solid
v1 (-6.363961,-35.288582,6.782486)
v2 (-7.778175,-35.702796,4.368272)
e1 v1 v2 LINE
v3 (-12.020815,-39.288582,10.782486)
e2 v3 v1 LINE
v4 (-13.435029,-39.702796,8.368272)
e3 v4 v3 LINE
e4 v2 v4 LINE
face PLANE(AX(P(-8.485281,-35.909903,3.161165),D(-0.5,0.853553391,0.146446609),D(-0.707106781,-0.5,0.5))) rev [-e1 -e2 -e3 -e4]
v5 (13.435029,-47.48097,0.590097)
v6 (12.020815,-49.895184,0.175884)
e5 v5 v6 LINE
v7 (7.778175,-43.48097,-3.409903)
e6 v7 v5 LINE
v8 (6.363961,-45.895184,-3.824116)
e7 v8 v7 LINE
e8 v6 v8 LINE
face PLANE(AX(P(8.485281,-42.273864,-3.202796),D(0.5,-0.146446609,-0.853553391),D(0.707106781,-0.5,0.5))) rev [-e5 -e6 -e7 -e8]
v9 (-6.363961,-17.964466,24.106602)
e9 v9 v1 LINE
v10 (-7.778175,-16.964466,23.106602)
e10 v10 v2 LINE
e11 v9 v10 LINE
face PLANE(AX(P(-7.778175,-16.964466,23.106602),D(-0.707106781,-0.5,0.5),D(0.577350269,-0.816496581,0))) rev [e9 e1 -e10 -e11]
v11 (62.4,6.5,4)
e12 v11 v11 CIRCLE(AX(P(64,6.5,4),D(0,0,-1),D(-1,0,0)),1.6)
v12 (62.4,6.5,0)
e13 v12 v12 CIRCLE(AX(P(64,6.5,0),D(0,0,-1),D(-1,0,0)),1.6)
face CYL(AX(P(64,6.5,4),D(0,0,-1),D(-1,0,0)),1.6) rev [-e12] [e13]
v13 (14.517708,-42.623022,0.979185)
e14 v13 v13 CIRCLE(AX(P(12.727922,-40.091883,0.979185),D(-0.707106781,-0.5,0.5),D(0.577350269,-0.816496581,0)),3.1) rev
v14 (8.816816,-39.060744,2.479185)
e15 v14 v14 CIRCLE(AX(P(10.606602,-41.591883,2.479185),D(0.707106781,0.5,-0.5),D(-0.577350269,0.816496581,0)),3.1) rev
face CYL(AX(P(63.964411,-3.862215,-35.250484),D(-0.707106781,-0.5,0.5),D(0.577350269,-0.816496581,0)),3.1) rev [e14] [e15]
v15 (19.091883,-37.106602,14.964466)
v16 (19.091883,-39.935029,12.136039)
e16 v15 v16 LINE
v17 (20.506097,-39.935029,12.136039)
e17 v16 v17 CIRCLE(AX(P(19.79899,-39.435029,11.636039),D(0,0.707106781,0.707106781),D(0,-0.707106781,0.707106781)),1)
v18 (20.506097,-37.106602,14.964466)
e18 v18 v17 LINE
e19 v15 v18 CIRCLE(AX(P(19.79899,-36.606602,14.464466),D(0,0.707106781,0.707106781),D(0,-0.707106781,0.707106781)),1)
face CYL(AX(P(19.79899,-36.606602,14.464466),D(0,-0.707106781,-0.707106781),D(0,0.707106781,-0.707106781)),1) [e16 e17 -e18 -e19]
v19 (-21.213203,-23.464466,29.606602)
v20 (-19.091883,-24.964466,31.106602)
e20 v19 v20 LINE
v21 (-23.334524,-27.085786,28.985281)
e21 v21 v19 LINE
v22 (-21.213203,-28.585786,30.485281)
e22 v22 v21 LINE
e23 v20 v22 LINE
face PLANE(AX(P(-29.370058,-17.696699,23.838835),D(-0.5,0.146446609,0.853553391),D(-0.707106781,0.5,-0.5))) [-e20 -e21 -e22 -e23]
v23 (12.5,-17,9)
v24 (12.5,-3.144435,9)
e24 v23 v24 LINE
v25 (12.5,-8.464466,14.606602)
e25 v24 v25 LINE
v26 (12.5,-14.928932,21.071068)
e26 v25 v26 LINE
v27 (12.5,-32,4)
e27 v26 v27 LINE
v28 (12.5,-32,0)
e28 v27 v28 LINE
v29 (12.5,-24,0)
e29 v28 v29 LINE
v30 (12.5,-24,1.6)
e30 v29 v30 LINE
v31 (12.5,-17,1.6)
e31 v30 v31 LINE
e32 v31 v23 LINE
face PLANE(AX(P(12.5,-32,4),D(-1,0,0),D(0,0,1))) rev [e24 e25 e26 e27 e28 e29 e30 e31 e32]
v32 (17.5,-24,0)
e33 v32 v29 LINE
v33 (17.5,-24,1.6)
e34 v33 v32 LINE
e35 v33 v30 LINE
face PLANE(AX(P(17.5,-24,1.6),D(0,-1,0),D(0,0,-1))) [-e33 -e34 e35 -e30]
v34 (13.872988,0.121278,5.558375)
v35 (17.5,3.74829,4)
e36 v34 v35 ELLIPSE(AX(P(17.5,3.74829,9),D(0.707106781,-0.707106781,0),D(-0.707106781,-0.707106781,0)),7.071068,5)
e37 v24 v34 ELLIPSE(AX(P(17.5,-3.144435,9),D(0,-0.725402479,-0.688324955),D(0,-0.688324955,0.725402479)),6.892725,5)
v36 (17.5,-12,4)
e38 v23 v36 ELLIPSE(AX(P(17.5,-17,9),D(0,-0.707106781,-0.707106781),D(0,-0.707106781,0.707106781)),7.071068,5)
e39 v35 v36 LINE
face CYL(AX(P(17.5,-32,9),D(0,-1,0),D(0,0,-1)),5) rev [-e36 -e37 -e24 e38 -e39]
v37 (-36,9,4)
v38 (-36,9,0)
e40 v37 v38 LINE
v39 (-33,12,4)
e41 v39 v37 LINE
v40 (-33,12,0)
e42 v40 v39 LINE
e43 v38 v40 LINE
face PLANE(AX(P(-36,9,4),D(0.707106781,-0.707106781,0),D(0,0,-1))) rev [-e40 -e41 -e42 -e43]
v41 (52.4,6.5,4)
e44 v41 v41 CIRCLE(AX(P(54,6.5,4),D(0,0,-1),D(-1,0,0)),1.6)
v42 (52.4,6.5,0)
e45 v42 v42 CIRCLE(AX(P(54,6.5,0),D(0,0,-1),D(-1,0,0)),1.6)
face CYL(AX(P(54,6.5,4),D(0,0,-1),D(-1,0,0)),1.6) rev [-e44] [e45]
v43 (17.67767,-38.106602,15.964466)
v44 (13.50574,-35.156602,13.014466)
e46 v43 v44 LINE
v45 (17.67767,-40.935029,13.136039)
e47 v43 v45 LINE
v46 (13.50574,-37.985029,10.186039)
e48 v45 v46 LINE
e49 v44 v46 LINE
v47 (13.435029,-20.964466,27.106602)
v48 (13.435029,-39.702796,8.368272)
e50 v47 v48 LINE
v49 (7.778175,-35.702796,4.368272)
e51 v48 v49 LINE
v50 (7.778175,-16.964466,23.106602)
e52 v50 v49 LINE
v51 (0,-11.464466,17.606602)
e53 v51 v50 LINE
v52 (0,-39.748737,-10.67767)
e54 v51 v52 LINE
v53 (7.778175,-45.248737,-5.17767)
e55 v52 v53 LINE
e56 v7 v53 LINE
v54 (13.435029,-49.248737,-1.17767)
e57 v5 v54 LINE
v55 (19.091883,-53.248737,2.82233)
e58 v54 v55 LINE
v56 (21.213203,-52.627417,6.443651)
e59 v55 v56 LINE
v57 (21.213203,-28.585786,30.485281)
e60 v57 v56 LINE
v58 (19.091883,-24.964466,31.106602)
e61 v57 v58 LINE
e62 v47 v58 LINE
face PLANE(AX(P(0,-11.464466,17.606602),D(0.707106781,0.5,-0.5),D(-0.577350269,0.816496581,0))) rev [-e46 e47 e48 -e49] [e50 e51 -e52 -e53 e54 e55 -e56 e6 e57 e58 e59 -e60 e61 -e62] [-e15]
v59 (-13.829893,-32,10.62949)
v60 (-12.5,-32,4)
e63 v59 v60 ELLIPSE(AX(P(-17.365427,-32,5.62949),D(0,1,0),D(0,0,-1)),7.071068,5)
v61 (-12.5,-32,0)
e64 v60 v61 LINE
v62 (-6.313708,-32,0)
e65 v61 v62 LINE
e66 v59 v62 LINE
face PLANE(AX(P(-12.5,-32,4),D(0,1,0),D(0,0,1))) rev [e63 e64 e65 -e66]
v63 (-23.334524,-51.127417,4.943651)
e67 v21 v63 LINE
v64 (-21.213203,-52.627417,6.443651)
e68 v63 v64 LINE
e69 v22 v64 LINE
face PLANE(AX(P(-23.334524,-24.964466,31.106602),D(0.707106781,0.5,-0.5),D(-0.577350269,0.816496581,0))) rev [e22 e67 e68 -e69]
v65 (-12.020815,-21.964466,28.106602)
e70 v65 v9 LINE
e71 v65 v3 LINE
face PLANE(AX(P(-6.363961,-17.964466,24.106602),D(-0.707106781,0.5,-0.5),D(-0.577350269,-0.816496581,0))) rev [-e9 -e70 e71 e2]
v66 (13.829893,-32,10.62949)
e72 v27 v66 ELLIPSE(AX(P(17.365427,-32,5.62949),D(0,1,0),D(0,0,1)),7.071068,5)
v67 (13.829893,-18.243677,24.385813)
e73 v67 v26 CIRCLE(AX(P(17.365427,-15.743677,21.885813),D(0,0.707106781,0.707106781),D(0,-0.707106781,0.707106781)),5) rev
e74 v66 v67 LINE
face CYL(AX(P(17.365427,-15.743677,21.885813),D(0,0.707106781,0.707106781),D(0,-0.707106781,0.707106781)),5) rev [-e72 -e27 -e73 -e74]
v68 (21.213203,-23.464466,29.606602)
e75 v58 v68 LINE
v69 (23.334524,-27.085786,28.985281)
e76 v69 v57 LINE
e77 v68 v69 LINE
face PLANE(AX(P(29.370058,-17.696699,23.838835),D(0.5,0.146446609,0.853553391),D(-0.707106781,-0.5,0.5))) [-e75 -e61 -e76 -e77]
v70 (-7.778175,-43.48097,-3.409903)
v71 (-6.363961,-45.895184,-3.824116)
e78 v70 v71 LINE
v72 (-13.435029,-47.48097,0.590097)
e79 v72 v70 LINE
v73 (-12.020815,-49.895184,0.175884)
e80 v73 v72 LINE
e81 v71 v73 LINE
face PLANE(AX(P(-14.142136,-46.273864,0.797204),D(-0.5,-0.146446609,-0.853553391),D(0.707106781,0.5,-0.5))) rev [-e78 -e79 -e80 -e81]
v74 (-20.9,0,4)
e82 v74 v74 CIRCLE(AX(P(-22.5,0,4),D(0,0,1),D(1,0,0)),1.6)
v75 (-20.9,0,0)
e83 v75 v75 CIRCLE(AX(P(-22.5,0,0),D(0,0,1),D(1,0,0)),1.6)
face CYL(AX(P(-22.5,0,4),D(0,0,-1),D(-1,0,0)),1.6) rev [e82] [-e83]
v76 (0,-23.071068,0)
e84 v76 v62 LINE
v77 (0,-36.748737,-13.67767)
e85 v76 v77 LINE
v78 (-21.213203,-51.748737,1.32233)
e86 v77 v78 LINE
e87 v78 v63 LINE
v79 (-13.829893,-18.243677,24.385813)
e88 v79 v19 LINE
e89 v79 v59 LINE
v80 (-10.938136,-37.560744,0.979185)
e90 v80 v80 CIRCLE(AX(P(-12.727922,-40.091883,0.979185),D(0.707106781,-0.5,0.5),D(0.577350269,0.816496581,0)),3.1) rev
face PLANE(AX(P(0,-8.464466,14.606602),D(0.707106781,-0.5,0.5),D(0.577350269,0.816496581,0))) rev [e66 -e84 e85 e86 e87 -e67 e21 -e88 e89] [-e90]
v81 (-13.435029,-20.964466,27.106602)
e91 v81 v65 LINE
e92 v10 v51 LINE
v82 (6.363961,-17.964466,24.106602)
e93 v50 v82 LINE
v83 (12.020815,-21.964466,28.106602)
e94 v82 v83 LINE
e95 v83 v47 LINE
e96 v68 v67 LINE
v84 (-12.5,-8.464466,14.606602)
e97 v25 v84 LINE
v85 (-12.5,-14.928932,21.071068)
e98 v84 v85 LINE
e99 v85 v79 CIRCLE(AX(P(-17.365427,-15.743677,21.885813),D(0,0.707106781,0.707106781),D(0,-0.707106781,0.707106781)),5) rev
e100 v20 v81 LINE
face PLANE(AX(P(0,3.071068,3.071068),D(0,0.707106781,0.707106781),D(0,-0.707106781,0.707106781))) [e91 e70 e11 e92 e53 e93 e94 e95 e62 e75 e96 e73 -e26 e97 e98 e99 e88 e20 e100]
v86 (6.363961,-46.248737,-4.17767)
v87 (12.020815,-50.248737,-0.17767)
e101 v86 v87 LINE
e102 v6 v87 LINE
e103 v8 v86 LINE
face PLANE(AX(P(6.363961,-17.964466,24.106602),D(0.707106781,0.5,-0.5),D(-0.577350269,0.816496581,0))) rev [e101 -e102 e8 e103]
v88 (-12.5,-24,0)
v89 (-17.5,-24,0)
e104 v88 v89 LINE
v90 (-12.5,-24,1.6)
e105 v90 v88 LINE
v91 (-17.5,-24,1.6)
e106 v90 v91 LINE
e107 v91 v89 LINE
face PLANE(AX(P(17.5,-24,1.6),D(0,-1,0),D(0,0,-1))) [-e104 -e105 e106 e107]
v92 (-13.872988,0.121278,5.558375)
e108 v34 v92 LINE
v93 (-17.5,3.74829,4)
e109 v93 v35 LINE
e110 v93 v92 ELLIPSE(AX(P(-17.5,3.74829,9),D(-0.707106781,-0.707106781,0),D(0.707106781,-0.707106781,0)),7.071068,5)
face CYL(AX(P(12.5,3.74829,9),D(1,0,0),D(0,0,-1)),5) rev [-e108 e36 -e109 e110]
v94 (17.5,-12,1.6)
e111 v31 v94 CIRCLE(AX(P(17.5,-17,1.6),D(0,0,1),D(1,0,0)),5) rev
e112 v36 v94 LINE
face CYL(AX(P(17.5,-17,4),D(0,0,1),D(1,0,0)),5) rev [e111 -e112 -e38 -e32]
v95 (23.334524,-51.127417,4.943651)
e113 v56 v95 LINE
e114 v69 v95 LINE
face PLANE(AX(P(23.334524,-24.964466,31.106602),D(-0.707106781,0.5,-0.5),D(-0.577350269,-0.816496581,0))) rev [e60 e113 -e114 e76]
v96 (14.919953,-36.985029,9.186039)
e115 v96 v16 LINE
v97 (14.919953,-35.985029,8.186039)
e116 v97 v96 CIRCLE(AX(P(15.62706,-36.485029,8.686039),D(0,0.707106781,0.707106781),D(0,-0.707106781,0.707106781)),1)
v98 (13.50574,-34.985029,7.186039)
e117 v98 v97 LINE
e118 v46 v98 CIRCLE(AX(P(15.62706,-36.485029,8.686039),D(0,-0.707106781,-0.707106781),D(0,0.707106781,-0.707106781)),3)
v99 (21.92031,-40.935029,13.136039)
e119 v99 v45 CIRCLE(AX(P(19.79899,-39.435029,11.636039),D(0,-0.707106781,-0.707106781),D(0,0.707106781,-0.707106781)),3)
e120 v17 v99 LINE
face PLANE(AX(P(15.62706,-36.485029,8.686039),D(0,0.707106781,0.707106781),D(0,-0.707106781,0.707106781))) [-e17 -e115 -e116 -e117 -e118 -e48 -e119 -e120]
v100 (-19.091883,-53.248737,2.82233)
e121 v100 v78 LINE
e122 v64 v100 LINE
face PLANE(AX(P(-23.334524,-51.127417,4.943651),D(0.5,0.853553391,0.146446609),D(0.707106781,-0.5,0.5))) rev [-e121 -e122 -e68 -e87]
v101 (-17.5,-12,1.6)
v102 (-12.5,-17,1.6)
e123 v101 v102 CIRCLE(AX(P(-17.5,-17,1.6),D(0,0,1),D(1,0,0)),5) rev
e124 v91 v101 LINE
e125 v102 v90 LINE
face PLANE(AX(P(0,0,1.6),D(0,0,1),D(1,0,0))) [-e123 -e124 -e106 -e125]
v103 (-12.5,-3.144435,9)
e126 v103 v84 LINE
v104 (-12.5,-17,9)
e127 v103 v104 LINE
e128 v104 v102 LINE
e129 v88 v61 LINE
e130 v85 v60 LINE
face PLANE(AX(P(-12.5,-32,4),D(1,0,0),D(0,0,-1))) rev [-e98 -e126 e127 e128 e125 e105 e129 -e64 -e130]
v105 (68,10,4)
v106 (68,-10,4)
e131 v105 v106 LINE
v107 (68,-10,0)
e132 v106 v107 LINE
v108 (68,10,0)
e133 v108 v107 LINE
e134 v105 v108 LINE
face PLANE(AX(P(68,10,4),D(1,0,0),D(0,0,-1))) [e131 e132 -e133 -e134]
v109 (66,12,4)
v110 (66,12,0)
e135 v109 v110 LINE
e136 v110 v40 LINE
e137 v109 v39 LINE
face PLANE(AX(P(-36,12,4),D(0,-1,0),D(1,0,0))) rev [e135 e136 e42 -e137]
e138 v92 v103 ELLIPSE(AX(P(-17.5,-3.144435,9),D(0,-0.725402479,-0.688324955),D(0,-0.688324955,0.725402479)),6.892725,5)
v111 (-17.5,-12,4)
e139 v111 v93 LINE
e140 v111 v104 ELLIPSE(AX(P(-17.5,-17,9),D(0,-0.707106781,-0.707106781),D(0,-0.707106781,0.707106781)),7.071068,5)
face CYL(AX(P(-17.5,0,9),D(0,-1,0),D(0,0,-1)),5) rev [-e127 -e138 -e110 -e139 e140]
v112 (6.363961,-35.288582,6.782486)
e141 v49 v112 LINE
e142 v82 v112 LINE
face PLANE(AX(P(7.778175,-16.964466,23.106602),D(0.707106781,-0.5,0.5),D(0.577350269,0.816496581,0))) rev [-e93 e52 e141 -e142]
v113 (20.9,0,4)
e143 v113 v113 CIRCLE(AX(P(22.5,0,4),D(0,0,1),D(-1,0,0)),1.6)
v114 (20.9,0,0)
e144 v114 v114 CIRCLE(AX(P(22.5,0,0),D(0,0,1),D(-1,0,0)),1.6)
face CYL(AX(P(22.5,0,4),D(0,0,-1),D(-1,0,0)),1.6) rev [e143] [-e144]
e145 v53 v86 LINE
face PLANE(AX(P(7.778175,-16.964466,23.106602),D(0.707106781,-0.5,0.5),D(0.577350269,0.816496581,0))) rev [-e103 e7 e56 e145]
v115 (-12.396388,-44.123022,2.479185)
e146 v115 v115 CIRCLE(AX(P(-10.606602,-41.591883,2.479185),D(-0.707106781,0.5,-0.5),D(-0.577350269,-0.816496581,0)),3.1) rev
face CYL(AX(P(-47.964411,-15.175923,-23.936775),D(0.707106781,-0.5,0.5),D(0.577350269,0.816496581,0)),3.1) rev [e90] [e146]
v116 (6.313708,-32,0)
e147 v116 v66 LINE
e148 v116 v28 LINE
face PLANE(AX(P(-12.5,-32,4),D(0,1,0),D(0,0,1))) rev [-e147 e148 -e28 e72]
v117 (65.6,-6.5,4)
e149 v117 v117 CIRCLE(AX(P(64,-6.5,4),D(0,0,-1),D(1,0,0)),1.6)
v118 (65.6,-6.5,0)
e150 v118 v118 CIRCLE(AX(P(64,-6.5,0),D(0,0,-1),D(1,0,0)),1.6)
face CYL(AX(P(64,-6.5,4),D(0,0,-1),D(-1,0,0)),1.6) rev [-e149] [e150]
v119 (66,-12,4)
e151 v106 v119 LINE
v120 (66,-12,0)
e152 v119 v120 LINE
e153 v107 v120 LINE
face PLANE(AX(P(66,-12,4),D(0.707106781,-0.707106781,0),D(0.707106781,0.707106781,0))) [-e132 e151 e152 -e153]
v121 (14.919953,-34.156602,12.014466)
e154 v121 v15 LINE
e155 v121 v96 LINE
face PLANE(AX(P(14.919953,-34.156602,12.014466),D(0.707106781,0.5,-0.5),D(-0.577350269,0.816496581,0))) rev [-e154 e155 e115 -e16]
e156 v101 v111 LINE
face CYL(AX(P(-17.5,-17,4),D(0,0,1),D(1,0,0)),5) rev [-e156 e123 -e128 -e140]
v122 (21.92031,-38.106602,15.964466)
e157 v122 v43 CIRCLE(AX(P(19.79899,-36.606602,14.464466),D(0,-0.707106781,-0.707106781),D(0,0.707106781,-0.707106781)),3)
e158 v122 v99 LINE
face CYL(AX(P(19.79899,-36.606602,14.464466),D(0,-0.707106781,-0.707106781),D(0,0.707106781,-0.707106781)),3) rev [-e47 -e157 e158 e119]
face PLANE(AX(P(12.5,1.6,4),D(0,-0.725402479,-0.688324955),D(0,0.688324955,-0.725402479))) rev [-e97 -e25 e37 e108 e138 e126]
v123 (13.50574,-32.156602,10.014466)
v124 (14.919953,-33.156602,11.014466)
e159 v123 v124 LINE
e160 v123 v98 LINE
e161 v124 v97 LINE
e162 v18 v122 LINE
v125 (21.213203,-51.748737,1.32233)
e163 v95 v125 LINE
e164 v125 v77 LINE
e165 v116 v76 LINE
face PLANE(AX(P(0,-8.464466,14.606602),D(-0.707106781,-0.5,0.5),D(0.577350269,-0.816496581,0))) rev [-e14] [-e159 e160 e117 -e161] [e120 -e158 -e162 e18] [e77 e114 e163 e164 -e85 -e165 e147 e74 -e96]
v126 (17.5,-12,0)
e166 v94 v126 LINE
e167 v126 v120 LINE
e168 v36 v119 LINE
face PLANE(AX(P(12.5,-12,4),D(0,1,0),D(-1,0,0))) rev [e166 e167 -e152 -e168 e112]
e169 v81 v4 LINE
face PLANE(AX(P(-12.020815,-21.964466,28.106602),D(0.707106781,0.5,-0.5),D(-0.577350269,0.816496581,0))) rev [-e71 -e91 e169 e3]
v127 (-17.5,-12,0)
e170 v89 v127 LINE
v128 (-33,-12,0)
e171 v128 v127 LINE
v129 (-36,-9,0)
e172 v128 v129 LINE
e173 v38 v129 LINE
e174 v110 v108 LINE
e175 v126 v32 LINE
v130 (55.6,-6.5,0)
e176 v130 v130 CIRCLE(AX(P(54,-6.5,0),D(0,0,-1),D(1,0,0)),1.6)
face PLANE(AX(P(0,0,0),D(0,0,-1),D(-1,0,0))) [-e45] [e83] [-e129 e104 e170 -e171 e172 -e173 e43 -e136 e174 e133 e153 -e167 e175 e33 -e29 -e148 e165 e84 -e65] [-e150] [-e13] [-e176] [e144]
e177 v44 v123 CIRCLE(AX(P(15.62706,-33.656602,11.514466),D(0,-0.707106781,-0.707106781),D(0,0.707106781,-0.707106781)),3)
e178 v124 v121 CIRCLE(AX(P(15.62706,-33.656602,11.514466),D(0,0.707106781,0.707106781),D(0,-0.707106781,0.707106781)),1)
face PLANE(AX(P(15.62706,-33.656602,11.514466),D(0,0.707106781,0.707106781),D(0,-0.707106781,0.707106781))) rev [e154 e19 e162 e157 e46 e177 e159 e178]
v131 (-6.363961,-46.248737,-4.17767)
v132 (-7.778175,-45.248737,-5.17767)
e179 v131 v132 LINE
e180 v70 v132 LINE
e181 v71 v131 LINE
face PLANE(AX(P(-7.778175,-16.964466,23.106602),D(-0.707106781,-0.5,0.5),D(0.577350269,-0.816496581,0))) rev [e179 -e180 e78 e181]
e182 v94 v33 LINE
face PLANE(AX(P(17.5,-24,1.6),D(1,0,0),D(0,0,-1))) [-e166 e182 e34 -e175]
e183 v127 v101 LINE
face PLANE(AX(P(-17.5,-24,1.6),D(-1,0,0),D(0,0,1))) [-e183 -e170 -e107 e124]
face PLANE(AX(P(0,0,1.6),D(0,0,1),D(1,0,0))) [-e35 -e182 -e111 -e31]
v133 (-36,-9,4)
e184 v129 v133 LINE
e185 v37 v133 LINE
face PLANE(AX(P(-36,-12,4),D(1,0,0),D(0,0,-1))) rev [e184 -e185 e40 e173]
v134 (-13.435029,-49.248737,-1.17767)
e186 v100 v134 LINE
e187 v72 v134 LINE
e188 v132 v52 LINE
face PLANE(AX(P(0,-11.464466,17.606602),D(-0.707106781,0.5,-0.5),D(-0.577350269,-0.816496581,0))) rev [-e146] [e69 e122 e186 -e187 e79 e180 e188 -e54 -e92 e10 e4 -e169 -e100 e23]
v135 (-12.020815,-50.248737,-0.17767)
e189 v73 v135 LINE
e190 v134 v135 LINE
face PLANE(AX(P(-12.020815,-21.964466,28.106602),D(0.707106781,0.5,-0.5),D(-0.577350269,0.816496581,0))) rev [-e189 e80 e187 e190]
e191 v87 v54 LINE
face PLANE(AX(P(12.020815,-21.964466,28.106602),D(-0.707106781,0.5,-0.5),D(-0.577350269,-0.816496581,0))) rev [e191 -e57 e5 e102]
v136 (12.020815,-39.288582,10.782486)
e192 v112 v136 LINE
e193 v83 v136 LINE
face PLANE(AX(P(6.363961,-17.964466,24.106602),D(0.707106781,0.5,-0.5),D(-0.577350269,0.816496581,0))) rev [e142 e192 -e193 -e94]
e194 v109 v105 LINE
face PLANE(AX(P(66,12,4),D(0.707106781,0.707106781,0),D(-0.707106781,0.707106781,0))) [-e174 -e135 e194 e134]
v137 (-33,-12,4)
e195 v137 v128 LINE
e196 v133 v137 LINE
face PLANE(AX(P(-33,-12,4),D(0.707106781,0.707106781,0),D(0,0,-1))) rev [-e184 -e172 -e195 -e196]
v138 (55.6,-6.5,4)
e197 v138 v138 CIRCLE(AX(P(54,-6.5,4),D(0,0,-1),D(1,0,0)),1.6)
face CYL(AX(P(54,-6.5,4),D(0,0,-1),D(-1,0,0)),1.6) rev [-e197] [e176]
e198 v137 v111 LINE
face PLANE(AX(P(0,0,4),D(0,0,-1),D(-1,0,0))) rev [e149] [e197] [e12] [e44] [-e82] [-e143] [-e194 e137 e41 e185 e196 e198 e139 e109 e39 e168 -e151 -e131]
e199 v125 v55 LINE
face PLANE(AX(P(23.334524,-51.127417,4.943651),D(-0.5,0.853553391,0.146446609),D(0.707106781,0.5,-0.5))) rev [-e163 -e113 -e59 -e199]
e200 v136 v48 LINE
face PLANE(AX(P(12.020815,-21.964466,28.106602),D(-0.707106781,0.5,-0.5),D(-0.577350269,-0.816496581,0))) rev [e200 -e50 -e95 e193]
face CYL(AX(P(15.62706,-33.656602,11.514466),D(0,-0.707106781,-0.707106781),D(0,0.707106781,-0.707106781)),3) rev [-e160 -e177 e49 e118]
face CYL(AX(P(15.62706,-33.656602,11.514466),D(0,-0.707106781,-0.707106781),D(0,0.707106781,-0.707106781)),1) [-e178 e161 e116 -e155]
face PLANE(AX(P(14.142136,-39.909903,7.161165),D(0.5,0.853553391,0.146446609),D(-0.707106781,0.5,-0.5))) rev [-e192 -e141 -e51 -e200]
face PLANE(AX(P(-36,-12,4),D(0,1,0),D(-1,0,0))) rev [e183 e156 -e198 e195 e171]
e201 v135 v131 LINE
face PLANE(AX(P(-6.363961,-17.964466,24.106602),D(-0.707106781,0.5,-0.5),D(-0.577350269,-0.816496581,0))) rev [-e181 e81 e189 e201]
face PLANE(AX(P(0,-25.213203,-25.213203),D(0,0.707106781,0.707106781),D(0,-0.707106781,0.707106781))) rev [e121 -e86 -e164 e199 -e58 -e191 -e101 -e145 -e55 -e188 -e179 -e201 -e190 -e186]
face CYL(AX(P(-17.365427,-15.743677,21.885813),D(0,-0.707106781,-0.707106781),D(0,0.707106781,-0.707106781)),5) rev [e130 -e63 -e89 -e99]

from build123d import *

# Parameters (mm, degrees)
CROQUIS1_R                   = 1.6
SALIENTE_EXTRUIR1_DEPTH      = 4
CROQUIS3_R                   = 1.6
SALIENTE_EXTRUIR3_DEPTH      = 4
SALIENTE_EXTRUIR4_DEPTH      = 10
SALIENTE_EXTRUIR4_DEPTH_BACK = 30
CORTAR_EXTRUIR8_REACH        = 97.414
CROQUIS13_R                  = 3.1
CORTAR_EXTRUIR9_DEPTH        = 2
CORTAR_EXTRUIR10_REACH       = 83.858
CROQUIS15_R                  = 3.1
CORTAR_EXTRUIR11_DEPTH       = 2
SALIENTE_EXTRUIR5_DEPTH      = 12.5
CORTAR_EXTRUIR12_DEPTH       = 95.018496218
REDONDEO1_R                  = 5
CHAFL_N1_SIZE                = 3
CROQUIS20_W                  = 35
CROQUIS20_H                  = 12
SALIENTE_EXTRUIR6_DEPTH      = 1.6
CORTAR_EXTRUIR13_START       = -16
CORTAR_EXTRUIR13_DEPTH       = 4


with BuildPart() as part:
    # Croquis1 → Saliente-Extruir1 (new body)
    with BuildSketch(Plane.XY):
        Polygon((12.5, -12), (36, -12), (36, 12), (-36, 12), (-36, -12), (-12.5, -12), (-12.5, -32), (12.5, -32), align=None)
        with Locations((-22.5, 0)):
            Circle(CROQUIS1_R, mode=Mode.SUBTRACT)
        with Locations(Location((22.5, 0, 0), (0, 0, 180))):
            Circle(CROQUIS1_R, mode=Mode.SUBTRACT)
    extrude(amount=SALIENTE_EXTRUIR1_DEPTH)

    # Croquis3 → Saliente-Extruir3 (add)
    with BuildSketch(Plane(origin=(0, 0, 0), x_dir=(-1, 0, 0), z_dir=(0, 0, -1))):
        Polygon((-66, 12), (-36, 12), (-36, -12), (-66, -12), (-68, -10), (-68, 10), align=None)
        with Locations((-54, 6.5)):
            Circle(CROQUIS3_R, mode=Mode.SUBTRACT)
        with Locations((-64, 6.5)):
            Circle(CROQUIS3_R, mode=Mode.SUBTRACT)
        with Locations(Location((-54, -6.5, 0), (0, 0, 180))):
            Circle(CROQUIS3_R, mode=Mode.SUBTRACT)
        with Locations(Location((-64, -6.5, 0), (0, 0, 180))):
            Circle(CROQUIS3_R, mode=Mode.SUBTRACT)
    extrude(amount=-SALIENTE_EXTRUIR3_DEPTH)

    # Croquis5 → Saliente-Extruir4 (add, two sides: drawn at the far end of the back side and taken through both)
    with BuildSketch(Plane(origin=(0, -4.201010127, -3.798989873), x_dir=(1, 0, 0), z_dir=(0, 0.7071067811865438, 0.7071067811865512)).offset(-SALIENTE_EXTRUIR4_DEPTH_BACK)):
        Polygon((-13.435028843, -33.707106781), (-21.213203436, -41.485281374), (-23.334523779, -39.363961031), (0, -16.029437252), (23.334523779, -39.363961031), (21.213203436, -41.485281374), (13.435028843, -33.707106781), (12.02081528, -35.121320344), (6.363961031, -29.464466094), (7.778174593, -28.050252532), (0, -20.272077939), (-7.778174593, -28.050252532), (-6.363961031, -29.464466094), (-12.02081528, -35.121320344), align=None)
    extrude(amount=SALIENTE_EXTRUIR4_DEPTH + SALIENTE_EXTRUIR4_DEPTH_BACK)

    # Croquis13 → Cortar-Extruir8 (cut, up to next)
    with BuildSketch(Plane(origin=(-11.692388155, -8.267766953, 8.267766953), x_dir=(0.40824829046385985, 0.2886751345948103, 0.866025403784441), z_dir=(-0.7071067811865496, -0.5000000000000013, 0.4999999999999959)), mode=Mode.PRIVATE) as cortar_extruir8_sk1:
        with Locations(Location((-5.529378483, -40.083354696, 0), (0, 0, 270))):
            Circle(CROQUIS13_R)
    cortar_extruir8_tool1 = extrude(cortar_extruir8_sk1.sketch, amount=-CORTAR_EXTRUIR8_REACH, mode=Mode.PRIVATE) & part.part
    add(cortar_extruir8_tool1.solids().sort_by_distance((9.192388, -42.591883, 3.479185))[0], mode=Mode.SUBTRACT)

    # Croquis14 → Cortar-Extruir9 (cut)
    with BuildSketch(Plane(origin=(-11.692388155, -8.267766953, 8.267766953), x_dir=(0.40824829046385985, 0.2886751345948103, 0.866025403784441), z_dir=(-0.7071067811865496, -0.5000000000000013, 0.4999999999999959))):
        Polygon((-11.513014174, -39.415444584), (-6.89421202, -45.947417231), (0.454257208, -40.751264808), (-4.164544945, -34.219292161), align=None)
    extrude(amount=-CORTAR_EXTRUIR9_DEPTH, mode=Mode.SUBTRACT)

    # Croquis15 → Cortar-Extruir10 (cut, up to next)
    with BuildSketch(Plane(origin=(8.62825877, -6.101100286, 14.767766953), x_dir=(0.6666666666666553, 0.23570226039552375, -0.7071067811865557), z_dir=(0.7071067811865587, -0.49999999999999484, 0.4999999999999895)), mode=Mode.PRIVATE) as cortar_extruir10_sk1:
        with Locations(Location((-12.499158228, -40.25364355, 0), (0, 0, 54.735610317))):
            Circle(CROQUIS15_R)
    cortar_extruir10_tool1 = extrude(cortar_extruir10_sk1.sketch, amount=-CORTAR_EXTRUIR10_REACH, mode=Mode.PRIVATE) & part.part
    add(cortar_extruir10_tool1.solids().sort_by_distance((-9.192388, -42.591883, 3.479185))[0], mode=Mode.SUBTRACT)

    # Croquis17 → Cortar-Extruir11 (cut)
    with BuildSketch(Plane(origin=(8.62825877, -6.101100286, 14.767766953), x_dir=(0.6666666666666595, 0.2357022603955385, -0.7071067811865467), z_dir=(0.7071067811865586, -0.4999999999999948, 0.49999999999998956))):
        Polygon((-14.770394394, -45.829617571), (-7.227922061, -43.162950904), (-10.227922061, -34.67766953), (-17.770394394, -37.344336196), align=None)
    extrude(amount=-CORTAR_EXTRUIR11_DEPTH, mode=Mode.SUBTRACT)

    # Croquis19 → Saliente-Extruir5 (add, symmetric)
    with BuildSketch(Plane(origin=(0, 0, 0), x_dir=(0, 0, -1), z_dir=(1, 0, 0))):
        Polygon((-14.606601718, -8.464466094), (-21.071067812, -14.928932188), (-4, -32), (-4, 1.6), align=None)
    extrude(amount=SALIENTE_EXTRUIR5_DEPTH, both=True)

    # Croquis18 → Cortar-Extruir12 (cut, through all)
    with BuildSketch(Plane(origin=(0, 3.071067812, 3.071067812), x_dir=(1, 0, 0), z_dir=(0, 0.7071067811865438, 0.7071067811865513))):
        Polygon((0, -20.556349186), (4.899494937, -25.455844123), (-4.899494937, -25.455844123), align=None)
    extrude(amount=-CORTAR_EXTRUIR12_DEPTH, mode=Mode.SUBTRACT)

    # Redondeo1
    # the kernel refuses this fillet: 5 mm, written as the material it adds along each edge
    with BuildSketch(Plane(origin=(12.5, -12, 4), x_dir=(1, 0, 0), z_dir=(0, 1, 0))) as redondeo1_piece_1_section:
        with BuildLine():
            CenterArc((REDONDEO1_R, -REDONDEO1_R), REDONDEO1_R, 90, 90)
            Line((0, -REDONDEO1_R), (0, 0))
            Line((0, 0), (REDONDEO1_R, 0))
        make_face()
    redondeo1_piece_1 = extrude(amount=26.1, mode=Mode.PRIVATE)
    redondeo1_piece_1 = split(redondeo1_piece_1, bisect_by=Plane(origin=(12.5, -4.843560917, 10.790651749), z_dir=(0, -0.7254024787176051, -0.6883249551413595)), keep=Keep.TOP, mode=Mode.PRIVATE)
    add(redondeo1_piece_1)
    with BuildSketch(Plane(origin=(-12.5, -12, 4), x_dir=(0, 0, 1), z_dir=(0, 1, 0))) as redondeo1_piece_2_section:
        with BuildLine():
            CenterArc((REDONDEO1_R, -REDONDEO1_R), REDONDEO1_R, 90, 90)
            Line((0, -REDONDEO1_R), (0, 0))
            Line((0, 0), (REDONDEO1_R, 0))
        make_face()
    redondeo1_piece_2 = extrude(amount=26.1, mode=Mode.PRIVATE)
    redondeo1_piece_2 = split(redondeo1_piece_2, bisect_by=Plane(origin=(-12.5, -4.843560917, 10.790651749), z_dir=(0, -0.7254024787176051, -0.6883249551413595)), keep=Keep.TOP, mode=Mode.PRIVATE)
    add(redondeo1_piece_2)
    with BuildSketch(Plane(origin=(9.142135624, -14.928932188, 21.071067812), x_dir=(1, 0, 0), z_dir=(5.181305113656439e-15, -0.7071067811865475, -0.7071067811865476))) as redondeo1_piece_3_section:
        with BuildLine():
            CenterArc((8.223291456, 1.152223645), REDONDEO1_R, 135, 58.323256203)
            Line((4.687757551, 4.687757551), (0, 0))
            Line((0, 0), (3.357864376, 0))
        make_face()
    redondeo1_piece_3 = extrude(amount=40.715861386, mode=Mode.PRIVATE)
    redondeo1_piece_3 = split(redondeo1_piece_3, bisect_by=Plane(origin=(9.142135624, -32, 21.071067812), z_dir=(0, 1, 0)), keep=Keep.TOP, mode=Mode.PRIVATE)
    add(redondeo1_piece_3)
    with BuildSketch(Plane(origin=(-9.142135624, -43.719393876, -7.719393876), x_dir=(-1, 0, 0), z_dir=(5.181305113656437e-15, 0.7071067811865476, 0.7071067811865476))) as redondeo1_piece_4_section:
        with BuildLine():
            CenterArc((8.223291456, 1.152223645), REDONDEO1_R, 135, 58.323256203)
            Line((4.687757551, 4.687757551), (0, 0))
            Line((0, 0), (3.357864376, 0))
        make_face()
    redondeo1_piece_4 = extrude(amount=40.715861386, mode=Mode.PRIVATE)
    redondeo1_piece_4 = split(redondeo1_piece_4, bisect_by=Plane(origin=(-9.142135624, -32, -7.719393876), z_dir=(0, 1, 0)), keep=Keep.TOP, mode=Mode.PRIVATE)
    add(redondeo1_piece_4)
    with BuildSketch(Plane(origin=(-12.5, -12, 0), x_dir=(-1, 0, 0), z_dir=(0, 0, 1))) as redondeo1_piece_5:
        with BuildLine():
            CenterArc((REDONDEO1_R, REDONDEO1_R), REDONDEO1_R, 180, 90)
            Line((0, REDONDEO1_R), (0, 0))
            Line((0, 0), (REDONDEO1_R, 0))
        make_face()
    extrude(amount=4)
    with BuildSketch(Plane(origin=(12.5, -12, 0), x_dir=(1, 0, 0), z_dir=(0, 0, 1))) as redondeo1_piece_6:
        with BuildLine():
            CenterArc((REDONDEO1_R, -REDONDEO1_R), REDONDEO1_R, 90, 90)
            Line((0, -REDONDEO1_R), (0, 0))
            Line((0, 0), (REDONDEO1_R, 0))
        make_face()
    extrude(amount=4)
    with BuildSketch(Plane(origin=(12.5, 1.6, 4), x_dir=(0, -0.6883249551413598, 0.725402478717605), z_dir=(-1, 0, 0))) as redondeo1_piece_7:
        with BuildLine():
            CenterArc((REDONDEO1_R * 0.429658091891, REDONDEO1_R), REDONDEO1_R, 223.497660381, 46.502339619)
            Line((-REDONDEO1_R * 0.295744386827, REDONDEO1_R * 0.311675044859), (0, 0))
            Line((0, 0), (REDONDEO1_R * 0.429658091891, 0))
        make_face()
    extrude(amount=25)
    with BuildSketch(Plane(origin=(12.5, -12, 0), x_dir=(1, 0, 0), z_dir=(0, 0, 1))) as redondeo1_piece_8a_section:
        with BuildLine():
            CenterArc((REDONDEO1_R, -REDONDEO1_R), REDONDEO1_R, 90, 90)
            Line((0, -REDONDEO1_R), (0, 0))
            Line((0, 0), (REDONDEO1_R, 0))
        make_face()
    redondeo1_piece_8a = extrude(amount=16.5, mode=Mode.PRIVATE)
    redondeo1_piece_8a = split(redondeo1_piece_8a, bisect_by=Plane(origin=(12.5, -12, 4), z_dir=(0, 0, 1)), keep=Keep.TOP, mode=Mode.PRIVATE)
    with BuildSketch(Plane(origin=(12.5, -24.5, 4), x_dir=(1, 0, 0), z_dir=(0, 1, 0))) as redondeo1_piece_8b_section:
        with BuildLine():
            CenterArc((REDONDEO1_R, -REDONDEO1_R), REDONDEO1_R, 90, 90)
            Line((0, -REDONDEO1_R), (0, 0))
            Line((0, 0), (REDONDEO1_R, 0))
        make_face()
    redondeo1_piece_8b = extrude(amount=38.6, mode=Mode.PRIVATE)
    redondeo1_piece_8b = split(redondeo1_piece_8b, bisect_by=Plane(origin=(12.5, -12, 4), z_dir=(0, -1, 0)), keep=Keep.TOP, mode=Mode.PRIVATE)
    redondeo1_piece_8 = redondeo1_piece_8a & redondeo1_piece_8b
    add(redondeo1_piece_8)
    with BuildSketch(Plane(origin=(17.870726149, 1.6, 4), x_dir=(0, -0.6883249551413598, 0.725402478717605), z_dir=(-1, 0, 0))) as redondeo1_piece_9a_section:
        with BuildLine():
            CenterArc((REDONDEO1_R * 0.429658091891, REDONDEO1_R), REDONDEO1_R, 223.497660381, 46.502339619)
            Line((-REDONDEO1_R * 0.295744386827, REDONDEO1_R * 0.311675044859), (0, 0))
            Line((0, 0), (REDONDEO1_R * 0.429658091891, 0))
        make_face()
    redondeo1_piece_9a = extrude(amount=30.370726149, mode=Mode.PRIVATE)
    redondeo1_piece_9a = split(redondeo1_piece_9a, bisect_by=Plane(origin=(12.5, 1.6, 4), z_dir=(1, 0, 0)), keep=Keep.TOP, mode=Mode.PRIVATE)
    with BuildSketch(Plane(origin=(12.5, -12, 4), x_dir=(1, 0, 0), z_dir=(0, 1, 0))) as redondeo1_piece_9b_section:
        with BuildLine():
            CenterArc((REDONDEO1_R, -REDONDEO1_R), REDONDEO1_R, 90, 90)
            Line((0, -REDONDEO1_R), (0, 0))
            Line((0, 0), (REDONDEO1_R, 0))
        make_face()
    redondeo1_piece_9b = extrude(amount=26.1, mode=Mode.PRIVATE)
    redondeo1_piece_9b = split(redondeo1_piece_9b, bisect_by=Plane(origin=(12.5, 12, 4), z_dir=(0, -1, 0)), keep=Keep.TOP, mode=Mode.PRIVATE)
    redondeo1_piece_9b = split(redondeo1_piece_9b, bisect_by=Plane(origin=(12.5, -4.843560917, 10.790651749), z_dir=(0, 0.7254024787176051, 0.6883249551413595)), keep=Keep.TOP, mode=Mode.PRIVATE)
    redondeo1_piece_9 = redondeo1_piece_9a & redondeo1_piece_9b
    add(redondeo1_piece_9)
    with BuildSketch(Plane(origin=(-12.5, -12, 0), x_dir=(-1, 0, 0), z_dir=(0, 0, 1))) as redondeo1_piece_10a_section:
        with BuildLine():
            CenterArc((REDONDEO1_R, REDONDEO1_R), REDONDEO1_R, 180, 90)
            Line((0, REDONDEO1_R), (0, 0))
            Line((0, 0), (REDONDEO1_R, 0))
        make_face()
    redondeo1_piece_10a = extrude(amount=16.5, mode=Mode.PRIVATE)
    redondeo1_piece_10a = split(redondeo1_piece_10a, bisect_by=Plane(origin=(-12.5, -12, 4), z_dir=(0, 0, 1)), keep=Keep.TOP, mode=Mode.PRIVATE)
    with BuildSketch(Plane(origin=(-12.5, -24.5, 4), x_dir=(0, 0, 1), z_dir=(0, 1, 0))) as redondeo1_piece_10b_section:
        with BuildLine():
            CenterArc((REDONDEO1_R, -REDONDEO1_R), REDONDEO1_R, 90, 90)
            Line((0, -REDONDEO1_R), (0, 0))
            Line((0, 0), (REDONDEO1_R, 0))
        make_face()
    redondeo1_piece_10b = extrude(amount=38.6, mode=Mode.PRIVATE)
    redondeo1_piece_10b = split(redondeo1_piece_10b, bisect_by=Plane(origin=(-12.5, -12, 4), z_dir=(0, -1, 0)), keep=Keep.TOP, mode=Mode.PRIVATE)
    redondeo1_piece_10 = redondeo1_piece_10a & redondeo1_piece_10b
    add(redondeo1_piece_10)
    with BuildSketch(Plane(origin=(-12.5, -12, 4), x_dir=(0, 0, 1), z_dir=(0, 1, 0))) as redondeo1_piece_11a_section:
        with BuildLine():
            CenterArc((REDONDEO1_R, -REDONDEO1_R), REDONDEO1_R, 90, 90)
            Line((0, -REDONDEO1_R), (0, 0))
            Line((0, 0), (REDONDEO1_R, 0))
        make_face()
    redondeo1_piece_11a = extrude(amount=26.1, mode=Mode.PRIVATE)
    redondeo1_piece_11a = split(redondeo1_piece_11a, bisect_by=Plane(origin=(-12.5, 12, 4), z_dir=(0, -1, 0)), keep=Keep.TOP, mode=Mode.PRIVATE)
    redondeo1_piece_11a = split(redondeo1_piece_11a, bisect_by=Plane(origin=(-12.5, -4.843560917, 10.790651749), z_dir=(0, 0.7254024787176051, 0.6883249551413595)), keep=Keep.TOP, mode=Mode.PRIVATE)
    with BuildSketch(Plane(origin=(12.5, 1.6, 4), x_dir=(0, -0.6883249551413598, 0.725402478717605), z_dir=(-1, 0, 0))) as redondeo1_piece_11b_section:
        with BuildLine():
            CenterArc((REDONDEO1_R * 0.429658091891, REDONDEO1_R), REDONDEO1_R, 223.497660381, 46.502339619)
            Line((-REDONDEO1_R * 0.295744386827, REDONDEO1_R * 0.311675044859), (0, 0))
            Line((0, 0), (REDONDEO1_R * 0.429658091891, 0))
        make_face()
    redondeo1_piece_11b = extrude(amount=30.370726149, mode=Mode.PRIVATE)
    redondeo1_piece_11b = split(redondeo1_piece_11b, bisect_by=Plane(origin=(-12.5, 1.6, 4), z_dir=(-1, 0, 0)), keep=Keep.TOP, mode=Mode.PRIVATE)
    redondeo1_piece_11 = redondeo1_piece_11a & redondeo1_piece_11b
    add(redondeo1_piece_11)

    # Chaflán1
    # the kernel refuses this chamfer: 3 mm, written as the material it takes off along each edge
    with BuildSketch(Plane(origin=(28.789887219, -49.39121286, -1.035194012), x_dir=(-0.7071067811865446, 0.500000000000004, -0.5000000000000001), z_dir=(-0.7071067811865506, -0.5000000000000006, 0.4999999999999953))) as chafl_n1_piece_1:
        Polygon((CHAFL_N1_SIZE, 0), (0, -CHAFL_N1_SIZE), (0, 0), align=None)
    extrude(amount=18.430097928, mode=Mode.SUBTRACT)
    with BuildSketch(Plane(origin=(28.789887219, -21.106941612, 27.249077236), x_dir=(-0.7071067811865446, 0.5000000000000879, -0.49999999999991623), z_dir=(-0.7071067811865506, -0.5000000000000006, 0.4999999999999953)), Plane(origin=(-15.757839996, -58.606261823, 8.179854952), x_dir=(0, 0.707106781186544, 0.7071067811865511), z_dir=(-0.7071067811865535, 0.4999999999999984, -0.49999999999999317)), Plane(origin=(-15.757839996, -30.321990576, 36.4641262), x_dir=(0.7071067811865416, 0.50000000000009, -0.49999999999991834), z_dir=(-0.7071067811865535, 0.4999999999999984, -0.49999999999999317))) as chafl_n1_piece_2:
        Polygon((CHAFL_N1_SIZE, 0), (0, CHAFL_N1_SIZE), (0, 0), align=None)
    extrude(amount=18.430097928, mode=Mode.SUBTRACT)
    with BuildSketch(Plane(origin=(-36, -12, -7.715048964), x_dir=(0, 1, 0), z_dir=(0, 0, 1)), Plane(origin=(-36, 12, -7.715048964), x_dir=(1, 0, 0), z_dir=(0, 0, 1))) as chafl_n1_piece_3:
        Polygon((CHAFL_N1_SIZE, 0), (0, -CHAFL_N1_SIZE), (0, 0), align=None)
    extrude(amount=19.430097928, mode=Mode.SUBTRACT)
    with BuildSketch(Plane(origin=(17.47617872, -45.267427059, 12.518689717), x_dir=(0.7071067811865496, 0.5000000000000003, -0.49999999999999684), z_dir=(-0.7071067811865456, 0.5000000000000039, -0.49999999999999906))) as chafl_n1_piece_4_section:
        Polygon((CHAFL_N1_SIZE, 0), (0, -CHAFL_N1_SIZE), (0, 0), align=None)
    chafl_n1_piece_4 = extrude(amount=23.430097928, mode=Mode.PRIVATE)
    chafl_n1_piece_4 = split(chafl_n1_piece_4, bisect_by=Plane(origin=(18.890392282, -44.267427059, 11.518689717), z_dir=(-0.7071067811865606, -0.49999999999999345, 0.4999999999999882)), keep=Keep.TOP, mode=Mode.PRIVATE)
    add(chafl_n1_piece_4, mode=Mode.SUBTRACT)
    with BuildSketch(Plane(origin=(-0.908597591, -33.552378095, 0.803640753), x_dir=(-0.7071067811865586, 0.49999999999999445, -0.49999999999999), z_dir=(-0.7071067811865365, -0.5000000000000099, 0.5000000000000058))) as chafl_n1_piece_5_section:
        Polygon((CHAFL_N1_SIZE, 0), (0, -CHAFL_N1_SIZE), (0, 0), align=None)
    chafl_n1_piece_5 = extrude(amount=23.430097928, mode=Mode.PRIVATE)
    chafl_n1_piece_5 = split(chafl_n1_piece_5, bisect_by=Plane(origin=(-2.322811153, -32.552378095, -0.196359247), z_dir=(0.7071067811865478, -0.5000000000000027, 0.4999999999999969)), keep=Keep.TOP, mode=Mode.PRIVATE)
    add(chafl_n1_piece_5, mode=Mode.SUBTRACT)
    with BuildSketch(Plane(origin=(-17.47617872, -51.631388089, 6.154728686), x_dir=(-0.7071067811865586, 0.49999999999999495, -0.49999999999998934), z_dir=(0.7071067811865365, 0.5000000000000046, -0.5000000000000111))) as chafl_n1_piece_6_section:
        Polygon((CHAFL_N1_SIZE, 0), (0, -CHAFL_N1_SIZE), (0, 0), align=None)
    chafl_n1_piece_6 = extrude(amount=23.430097928, mode=Mode.PRIVATE)
    chafl_n1_piece_6 = split(chafl_n1_piece_6, bisect_by=Plane(origin=(-18.890392282, -50.631388089, 5.154728686), z_dir=(0.7071067811865478, -0.5000000000000027, 0.4999999999999969)), keep=Keep.TOP, mode=Mode.PRIVATE)
    add(chafl_n1_piece_6, mode=Mode.SUBTRACT)
    with BuildSketch(Plane(origin=(0.908597591, -39.916339125, -5.560320277), x_dir=(0.7071067811865496, 0.5000000000000003, -0.4999999999999967), z_dir=(0.7071067811865456, -0.5000000000000033, 0.49999999999999967))) as chafl_n1_piece_7_section:
        Polygon((CHAFL_N1_SIZE, 0), (0, -CHAFL_N1_SIZE), (0, 0), align=None)
    chafl_n1_piece_7 = extrude(amount=23.430097928, mode=Mode.PRIVATE)
    chafl_n1_piece_7 = split(chafl_n1_piece_7, bisect_by=Plane(origin=(2.322811153, -38.916339125, -6.560320277), z_dir=(-0.7071067811865606, -0.49999999999999345, 0.4999999999999882)), keep=Keep.TOP, mode=Mode.PRIVATE)
    add(chafl_n1_piece_7, mode=Mode.SUBTRACT)

    # Croquis20 → Saliente-Extruir6 (add)
    with BuildSketch(Plane(origin=(0, 0, 0), x_dir=(-1, 0, 0), z_dir=(0, 0, -1))):
        with Locations((0, -18)):
            Rectangle(CROQUIS20_W, CROQUIS20_H)
    extrude(amount=-SALIENTE_EXTRUIR6_DEPTH)

    # Croquis23 → Cortar-Extruir13 (cut)
    with BuildSketch(Plane(origin=(0, -25.213203436, -25.213203436), x_dir=(1, 0, 0), z_dir=(0, -0.7071067811865437, -0.7071067811865513)).offset(CORTAR_EXTRUIR13_START)):
        with BuildLine():
            Line((14.919953083, 32.647875144), (19.091883092, 36.819805153))
            ThreePointArc((19.091883092, 36.819805153), (19.798989873, 37.112698372), (20.506096654, 36.819805153))
            Line((20.506096654, 36.819805153), (21.920310217, 38.234018716))
            ThreePointArc((21.920310217, 38.234018716), (19.798989873, 39.112698372), (17.67766953, 38.234018716))
            Line((17.67766953, 38.234018716), (13.505739521, 34.062088707))
            ThreePointArc((13.505739521, 34.062088707), (12.627059864, 31.940768363), (13.505739521, 29.81944802))
            Line((13.505739521, 29.81944802), (14.919953083, 31.233661582))
            ThreePointArc((14.919953083, 31.233661582), (14.627059864, 31.940768363), (14.919953083, 32.647875144))
        make_face()
    extrude(amount=-CORTAR_EXTRUIR13_DEPTH, mode=Mode.SUBTRACT)


solid = part.part
